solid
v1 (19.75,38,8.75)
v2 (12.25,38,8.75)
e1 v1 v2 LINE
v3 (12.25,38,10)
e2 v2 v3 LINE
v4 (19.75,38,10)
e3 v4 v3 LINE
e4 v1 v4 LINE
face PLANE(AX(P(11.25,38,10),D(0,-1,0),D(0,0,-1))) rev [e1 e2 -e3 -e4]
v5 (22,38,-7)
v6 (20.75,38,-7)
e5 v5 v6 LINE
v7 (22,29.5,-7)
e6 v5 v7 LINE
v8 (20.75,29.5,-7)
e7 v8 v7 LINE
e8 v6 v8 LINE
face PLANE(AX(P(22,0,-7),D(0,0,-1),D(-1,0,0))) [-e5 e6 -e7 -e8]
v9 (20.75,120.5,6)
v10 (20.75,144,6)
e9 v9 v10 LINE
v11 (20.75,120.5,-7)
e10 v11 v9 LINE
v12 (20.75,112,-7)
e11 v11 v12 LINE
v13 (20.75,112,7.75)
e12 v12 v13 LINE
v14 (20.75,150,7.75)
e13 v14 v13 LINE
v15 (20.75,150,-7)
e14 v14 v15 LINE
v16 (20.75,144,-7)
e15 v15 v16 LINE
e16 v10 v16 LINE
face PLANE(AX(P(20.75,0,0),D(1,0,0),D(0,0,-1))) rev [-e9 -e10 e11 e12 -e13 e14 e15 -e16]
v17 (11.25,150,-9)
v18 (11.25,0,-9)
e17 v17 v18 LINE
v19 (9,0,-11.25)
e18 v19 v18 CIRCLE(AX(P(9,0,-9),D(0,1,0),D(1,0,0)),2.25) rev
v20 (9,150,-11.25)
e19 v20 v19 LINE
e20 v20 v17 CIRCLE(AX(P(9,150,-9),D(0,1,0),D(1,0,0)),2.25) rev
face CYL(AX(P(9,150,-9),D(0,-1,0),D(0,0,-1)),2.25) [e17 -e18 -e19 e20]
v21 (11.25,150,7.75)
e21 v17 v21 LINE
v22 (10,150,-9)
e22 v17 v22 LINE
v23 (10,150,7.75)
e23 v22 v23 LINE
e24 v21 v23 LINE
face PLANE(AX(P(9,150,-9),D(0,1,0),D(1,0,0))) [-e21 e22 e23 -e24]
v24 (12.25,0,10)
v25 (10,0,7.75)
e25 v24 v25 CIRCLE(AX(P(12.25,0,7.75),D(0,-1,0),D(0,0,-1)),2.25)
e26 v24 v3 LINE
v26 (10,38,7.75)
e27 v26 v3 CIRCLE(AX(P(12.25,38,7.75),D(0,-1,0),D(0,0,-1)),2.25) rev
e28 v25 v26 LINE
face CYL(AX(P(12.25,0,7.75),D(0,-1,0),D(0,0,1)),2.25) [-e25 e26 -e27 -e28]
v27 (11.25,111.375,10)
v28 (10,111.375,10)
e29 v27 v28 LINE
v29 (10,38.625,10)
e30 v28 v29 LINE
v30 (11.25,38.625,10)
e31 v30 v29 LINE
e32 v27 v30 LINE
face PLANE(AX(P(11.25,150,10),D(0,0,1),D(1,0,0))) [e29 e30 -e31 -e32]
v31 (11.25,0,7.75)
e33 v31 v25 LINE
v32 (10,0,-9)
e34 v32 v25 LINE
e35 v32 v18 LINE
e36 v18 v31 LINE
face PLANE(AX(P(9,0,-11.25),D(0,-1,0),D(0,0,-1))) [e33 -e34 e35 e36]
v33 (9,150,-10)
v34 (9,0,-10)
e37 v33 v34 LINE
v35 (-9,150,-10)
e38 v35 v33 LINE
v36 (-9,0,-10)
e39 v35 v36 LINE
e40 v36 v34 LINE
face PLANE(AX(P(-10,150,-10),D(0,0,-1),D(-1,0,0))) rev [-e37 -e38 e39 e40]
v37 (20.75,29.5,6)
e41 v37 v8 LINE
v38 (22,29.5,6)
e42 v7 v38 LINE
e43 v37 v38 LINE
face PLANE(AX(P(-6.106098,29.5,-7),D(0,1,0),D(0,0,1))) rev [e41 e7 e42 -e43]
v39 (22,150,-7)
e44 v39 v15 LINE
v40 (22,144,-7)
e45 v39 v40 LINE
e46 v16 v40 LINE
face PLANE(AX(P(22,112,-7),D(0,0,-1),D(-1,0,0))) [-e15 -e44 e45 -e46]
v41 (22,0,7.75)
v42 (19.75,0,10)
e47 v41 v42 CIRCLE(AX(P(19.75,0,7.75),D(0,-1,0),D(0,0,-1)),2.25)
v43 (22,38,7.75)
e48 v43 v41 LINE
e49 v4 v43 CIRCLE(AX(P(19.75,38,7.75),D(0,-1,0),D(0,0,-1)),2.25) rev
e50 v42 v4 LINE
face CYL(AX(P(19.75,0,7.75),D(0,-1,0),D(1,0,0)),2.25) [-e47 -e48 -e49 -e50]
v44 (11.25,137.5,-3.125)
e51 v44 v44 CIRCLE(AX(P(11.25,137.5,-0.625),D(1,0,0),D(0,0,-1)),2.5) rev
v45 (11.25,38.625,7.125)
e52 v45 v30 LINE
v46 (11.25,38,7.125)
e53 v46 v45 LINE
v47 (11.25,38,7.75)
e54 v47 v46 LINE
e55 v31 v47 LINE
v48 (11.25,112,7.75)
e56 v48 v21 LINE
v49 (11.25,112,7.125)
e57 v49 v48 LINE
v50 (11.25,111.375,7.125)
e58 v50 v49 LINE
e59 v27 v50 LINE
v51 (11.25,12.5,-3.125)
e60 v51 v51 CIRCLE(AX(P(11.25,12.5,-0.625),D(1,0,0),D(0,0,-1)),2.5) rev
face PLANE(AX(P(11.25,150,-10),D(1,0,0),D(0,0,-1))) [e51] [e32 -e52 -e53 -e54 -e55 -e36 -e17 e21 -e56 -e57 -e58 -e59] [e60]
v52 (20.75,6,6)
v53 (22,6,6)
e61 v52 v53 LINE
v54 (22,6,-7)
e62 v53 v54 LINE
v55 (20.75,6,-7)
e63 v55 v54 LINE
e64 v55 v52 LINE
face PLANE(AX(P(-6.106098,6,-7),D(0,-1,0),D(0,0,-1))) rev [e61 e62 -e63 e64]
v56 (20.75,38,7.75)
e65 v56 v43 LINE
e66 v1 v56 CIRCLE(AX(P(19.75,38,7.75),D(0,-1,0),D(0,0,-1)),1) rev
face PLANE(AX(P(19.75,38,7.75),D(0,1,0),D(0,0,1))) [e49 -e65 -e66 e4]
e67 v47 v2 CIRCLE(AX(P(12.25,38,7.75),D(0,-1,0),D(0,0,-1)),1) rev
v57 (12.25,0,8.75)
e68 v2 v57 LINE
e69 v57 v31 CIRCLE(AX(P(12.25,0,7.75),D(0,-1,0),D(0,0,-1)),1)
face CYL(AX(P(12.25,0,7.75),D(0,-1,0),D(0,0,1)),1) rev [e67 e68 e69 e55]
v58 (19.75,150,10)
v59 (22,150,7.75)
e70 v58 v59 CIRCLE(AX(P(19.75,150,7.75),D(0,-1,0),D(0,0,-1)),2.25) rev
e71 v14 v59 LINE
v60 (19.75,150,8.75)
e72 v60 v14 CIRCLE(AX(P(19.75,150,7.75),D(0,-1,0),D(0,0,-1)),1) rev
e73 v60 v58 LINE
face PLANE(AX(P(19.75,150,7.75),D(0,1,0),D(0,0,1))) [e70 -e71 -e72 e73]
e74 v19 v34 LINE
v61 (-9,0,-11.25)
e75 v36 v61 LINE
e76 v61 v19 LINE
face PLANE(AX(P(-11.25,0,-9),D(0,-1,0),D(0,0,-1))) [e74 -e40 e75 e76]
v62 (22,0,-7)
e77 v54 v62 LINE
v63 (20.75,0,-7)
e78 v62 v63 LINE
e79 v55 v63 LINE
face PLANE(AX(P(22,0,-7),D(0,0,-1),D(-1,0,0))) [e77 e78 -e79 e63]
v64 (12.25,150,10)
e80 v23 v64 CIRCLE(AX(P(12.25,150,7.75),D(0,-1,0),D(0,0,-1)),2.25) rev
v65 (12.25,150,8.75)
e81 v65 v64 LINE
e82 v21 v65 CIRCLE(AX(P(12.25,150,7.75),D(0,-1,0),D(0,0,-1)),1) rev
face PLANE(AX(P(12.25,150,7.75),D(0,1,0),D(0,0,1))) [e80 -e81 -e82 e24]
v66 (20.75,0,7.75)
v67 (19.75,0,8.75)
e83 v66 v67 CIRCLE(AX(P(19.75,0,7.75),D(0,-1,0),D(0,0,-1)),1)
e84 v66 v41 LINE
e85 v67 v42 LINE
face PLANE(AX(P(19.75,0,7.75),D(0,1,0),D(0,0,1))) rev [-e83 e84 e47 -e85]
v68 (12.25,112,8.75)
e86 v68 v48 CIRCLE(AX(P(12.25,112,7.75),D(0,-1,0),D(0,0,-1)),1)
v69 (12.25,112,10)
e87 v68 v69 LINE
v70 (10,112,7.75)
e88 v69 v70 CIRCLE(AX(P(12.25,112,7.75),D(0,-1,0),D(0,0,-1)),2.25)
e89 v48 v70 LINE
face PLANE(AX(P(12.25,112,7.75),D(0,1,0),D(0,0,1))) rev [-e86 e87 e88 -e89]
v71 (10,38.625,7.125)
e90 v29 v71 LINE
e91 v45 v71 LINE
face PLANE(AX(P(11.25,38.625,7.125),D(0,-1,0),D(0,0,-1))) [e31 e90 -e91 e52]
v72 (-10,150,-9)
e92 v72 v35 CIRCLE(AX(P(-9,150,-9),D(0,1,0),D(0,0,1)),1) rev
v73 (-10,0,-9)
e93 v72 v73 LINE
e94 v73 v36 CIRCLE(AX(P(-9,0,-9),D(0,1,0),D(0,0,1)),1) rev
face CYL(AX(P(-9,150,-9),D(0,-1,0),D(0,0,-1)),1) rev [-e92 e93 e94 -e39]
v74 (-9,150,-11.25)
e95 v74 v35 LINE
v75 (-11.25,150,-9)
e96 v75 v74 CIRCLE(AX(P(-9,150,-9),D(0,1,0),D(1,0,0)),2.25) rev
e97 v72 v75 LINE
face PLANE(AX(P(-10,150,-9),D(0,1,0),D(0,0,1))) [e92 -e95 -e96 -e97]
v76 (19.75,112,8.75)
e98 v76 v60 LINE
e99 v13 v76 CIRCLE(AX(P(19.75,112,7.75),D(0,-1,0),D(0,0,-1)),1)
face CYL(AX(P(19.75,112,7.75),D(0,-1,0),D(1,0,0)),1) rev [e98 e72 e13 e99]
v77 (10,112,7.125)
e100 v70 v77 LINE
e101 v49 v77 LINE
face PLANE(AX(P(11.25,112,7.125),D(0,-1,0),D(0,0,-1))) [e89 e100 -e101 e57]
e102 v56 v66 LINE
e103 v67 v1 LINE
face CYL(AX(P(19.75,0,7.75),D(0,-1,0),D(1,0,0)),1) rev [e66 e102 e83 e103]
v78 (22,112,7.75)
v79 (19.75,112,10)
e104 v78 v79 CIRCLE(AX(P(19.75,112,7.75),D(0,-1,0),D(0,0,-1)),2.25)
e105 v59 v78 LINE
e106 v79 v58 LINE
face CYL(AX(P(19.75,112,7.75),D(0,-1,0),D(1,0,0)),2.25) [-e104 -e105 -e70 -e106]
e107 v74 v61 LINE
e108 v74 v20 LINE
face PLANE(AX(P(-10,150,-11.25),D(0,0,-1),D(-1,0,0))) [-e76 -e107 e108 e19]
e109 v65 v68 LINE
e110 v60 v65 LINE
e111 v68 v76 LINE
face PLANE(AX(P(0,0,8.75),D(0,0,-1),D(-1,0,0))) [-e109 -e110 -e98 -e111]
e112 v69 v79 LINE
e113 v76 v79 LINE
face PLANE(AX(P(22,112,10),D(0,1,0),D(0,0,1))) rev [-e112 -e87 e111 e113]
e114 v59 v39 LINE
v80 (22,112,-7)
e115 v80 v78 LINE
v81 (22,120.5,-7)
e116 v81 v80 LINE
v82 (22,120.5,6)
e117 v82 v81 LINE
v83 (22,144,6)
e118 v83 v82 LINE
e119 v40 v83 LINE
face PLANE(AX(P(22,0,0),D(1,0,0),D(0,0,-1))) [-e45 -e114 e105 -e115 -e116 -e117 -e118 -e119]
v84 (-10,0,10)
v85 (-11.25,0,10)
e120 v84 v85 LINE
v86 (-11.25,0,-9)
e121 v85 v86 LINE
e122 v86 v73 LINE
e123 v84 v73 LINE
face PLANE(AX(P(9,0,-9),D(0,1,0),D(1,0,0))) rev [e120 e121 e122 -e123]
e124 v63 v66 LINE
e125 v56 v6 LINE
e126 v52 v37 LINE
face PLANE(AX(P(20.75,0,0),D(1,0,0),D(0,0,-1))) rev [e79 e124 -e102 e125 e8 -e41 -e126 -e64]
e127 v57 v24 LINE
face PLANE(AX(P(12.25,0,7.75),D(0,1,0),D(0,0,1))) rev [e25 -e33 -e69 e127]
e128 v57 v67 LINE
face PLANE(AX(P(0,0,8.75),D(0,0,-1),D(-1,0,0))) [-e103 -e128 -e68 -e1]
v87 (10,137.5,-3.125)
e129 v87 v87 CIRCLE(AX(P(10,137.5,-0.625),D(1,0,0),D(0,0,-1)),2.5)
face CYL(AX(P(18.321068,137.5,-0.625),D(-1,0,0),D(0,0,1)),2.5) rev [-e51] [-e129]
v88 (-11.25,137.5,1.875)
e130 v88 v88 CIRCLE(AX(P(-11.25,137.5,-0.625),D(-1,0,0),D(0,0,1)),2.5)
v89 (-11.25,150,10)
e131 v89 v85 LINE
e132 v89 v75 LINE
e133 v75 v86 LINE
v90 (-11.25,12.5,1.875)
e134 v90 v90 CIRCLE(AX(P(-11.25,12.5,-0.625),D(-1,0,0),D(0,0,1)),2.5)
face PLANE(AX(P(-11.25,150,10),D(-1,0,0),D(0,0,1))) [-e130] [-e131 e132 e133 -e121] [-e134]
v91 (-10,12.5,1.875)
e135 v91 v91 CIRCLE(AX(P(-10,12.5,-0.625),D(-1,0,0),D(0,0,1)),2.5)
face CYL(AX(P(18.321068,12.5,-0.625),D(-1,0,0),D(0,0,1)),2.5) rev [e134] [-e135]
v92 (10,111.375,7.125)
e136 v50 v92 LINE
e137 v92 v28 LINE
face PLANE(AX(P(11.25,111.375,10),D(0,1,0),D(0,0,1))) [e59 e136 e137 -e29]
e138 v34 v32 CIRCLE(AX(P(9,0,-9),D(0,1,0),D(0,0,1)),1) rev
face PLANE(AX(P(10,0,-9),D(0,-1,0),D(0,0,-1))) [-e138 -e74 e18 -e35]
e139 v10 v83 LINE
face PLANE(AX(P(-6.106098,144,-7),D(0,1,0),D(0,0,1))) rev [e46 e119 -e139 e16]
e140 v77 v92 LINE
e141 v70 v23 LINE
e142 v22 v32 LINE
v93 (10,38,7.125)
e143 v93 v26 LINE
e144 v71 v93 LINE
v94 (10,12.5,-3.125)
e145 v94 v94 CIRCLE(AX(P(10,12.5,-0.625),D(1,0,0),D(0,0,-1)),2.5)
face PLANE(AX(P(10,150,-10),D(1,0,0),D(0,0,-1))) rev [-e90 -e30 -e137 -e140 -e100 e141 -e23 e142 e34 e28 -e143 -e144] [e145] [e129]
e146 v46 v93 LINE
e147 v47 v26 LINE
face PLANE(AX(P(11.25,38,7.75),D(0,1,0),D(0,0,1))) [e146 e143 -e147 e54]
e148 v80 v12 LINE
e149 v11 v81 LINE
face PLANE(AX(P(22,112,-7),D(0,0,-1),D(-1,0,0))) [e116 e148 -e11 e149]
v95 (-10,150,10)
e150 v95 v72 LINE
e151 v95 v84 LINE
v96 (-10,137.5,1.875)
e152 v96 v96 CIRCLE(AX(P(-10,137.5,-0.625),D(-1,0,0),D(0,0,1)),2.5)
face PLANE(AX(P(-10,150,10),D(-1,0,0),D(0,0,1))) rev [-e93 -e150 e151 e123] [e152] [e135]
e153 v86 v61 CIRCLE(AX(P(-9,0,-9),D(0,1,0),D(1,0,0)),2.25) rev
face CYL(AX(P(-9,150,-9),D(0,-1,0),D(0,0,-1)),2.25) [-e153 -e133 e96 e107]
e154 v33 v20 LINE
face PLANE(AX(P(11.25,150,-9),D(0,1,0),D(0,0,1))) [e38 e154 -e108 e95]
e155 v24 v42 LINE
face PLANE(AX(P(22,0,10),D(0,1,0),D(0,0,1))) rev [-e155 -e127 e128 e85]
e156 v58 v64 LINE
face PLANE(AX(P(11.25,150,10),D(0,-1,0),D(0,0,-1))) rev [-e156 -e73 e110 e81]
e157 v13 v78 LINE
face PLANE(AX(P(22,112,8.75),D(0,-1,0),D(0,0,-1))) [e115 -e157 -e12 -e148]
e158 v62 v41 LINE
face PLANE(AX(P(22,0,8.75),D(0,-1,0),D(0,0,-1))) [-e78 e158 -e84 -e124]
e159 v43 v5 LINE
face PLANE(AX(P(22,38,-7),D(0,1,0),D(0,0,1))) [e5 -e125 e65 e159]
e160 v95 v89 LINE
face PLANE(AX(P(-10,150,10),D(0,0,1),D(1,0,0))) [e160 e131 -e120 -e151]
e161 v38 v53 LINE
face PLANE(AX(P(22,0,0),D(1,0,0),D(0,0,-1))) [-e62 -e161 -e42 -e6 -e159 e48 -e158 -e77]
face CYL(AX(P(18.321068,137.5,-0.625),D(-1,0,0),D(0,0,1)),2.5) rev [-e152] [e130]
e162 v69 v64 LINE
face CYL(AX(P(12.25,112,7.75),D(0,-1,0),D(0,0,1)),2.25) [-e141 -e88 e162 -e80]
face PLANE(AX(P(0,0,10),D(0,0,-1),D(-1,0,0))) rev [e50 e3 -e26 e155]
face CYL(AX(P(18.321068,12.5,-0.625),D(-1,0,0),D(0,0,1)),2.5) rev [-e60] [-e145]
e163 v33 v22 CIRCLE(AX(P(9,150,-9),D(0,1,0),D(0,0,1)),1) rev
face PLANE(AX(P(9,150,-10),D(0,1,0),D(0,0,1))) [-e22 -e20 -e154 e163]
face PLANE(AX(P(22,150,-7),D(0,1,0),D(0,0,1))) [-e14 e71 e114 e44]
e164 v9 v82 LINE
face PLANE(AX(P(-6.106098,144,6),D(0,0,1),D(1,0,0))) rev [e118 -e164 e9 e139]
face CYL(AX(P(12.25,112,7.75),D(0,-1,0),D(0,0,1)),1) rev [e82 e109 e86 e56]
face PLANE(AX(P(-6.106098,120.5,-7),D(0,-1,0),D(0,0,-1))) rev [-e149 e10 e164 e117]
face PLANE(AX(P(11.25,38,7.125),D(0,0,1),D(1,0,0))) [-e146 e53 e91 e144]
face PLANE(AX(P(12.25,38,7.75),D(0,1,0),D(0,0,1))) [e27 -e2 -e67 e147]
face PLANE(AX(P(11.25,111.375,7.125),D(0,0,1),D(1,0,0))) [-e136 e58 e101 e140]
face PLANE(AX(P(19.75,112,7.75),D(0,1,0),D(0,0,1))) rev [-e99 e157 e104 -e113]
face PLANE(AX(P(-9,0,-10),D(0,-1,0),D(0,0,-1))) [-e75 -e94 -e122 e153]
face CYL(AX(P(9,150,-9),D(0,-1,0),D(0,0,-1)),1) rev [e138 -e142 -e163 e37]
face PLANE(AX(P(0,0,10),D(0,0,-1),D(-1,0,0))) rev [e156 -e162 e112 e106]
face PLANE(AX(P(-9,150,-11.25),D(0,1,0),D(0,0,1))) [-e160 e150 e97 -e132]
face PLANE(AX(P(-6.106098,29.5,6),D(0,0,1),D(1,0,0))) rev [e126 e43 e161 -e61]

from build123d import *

# Parameters (mm, degrees)
BASE_FLANGE1_DEPTH            = 150
CUT_EXTRUDE1_REACH            = 154.095
SKETCH7_R                     = 2.5
EDGE_FLANGE1_STRIP_W          = 7
EDGE_FLANGE1_STRIP_H          = 1.25
EDGE_FLANGE1_STRIP_CUT_DEPTH  = 38
EDGE_FLANGE1_RELIEF_W         = 7.625
EDGE_FLANGE1_RELIEF_H         = 0.625
EDGE_FLANGE1_RELIEF_CUT_DEPTH = 1.25
EDGE_FLANGE1_DEPTH            = 38
EDGE_FLANGE2_STRIP_W          = 7
EDGE_FLANGE2_STRIP_H          = 1.25
EDGE_FLANGE2_STRIP_CUT_DEPTH  = 38
EDGE_FLANGE2_DEPTH            = 38
SKETCH14_W                    = 13
SKETCH14_H                    = 23.5
CUT_EXTRUDE2_DEPTH            = 1.25
EDGE_FLANGE3_STRIP_W          = 7
EDGE_FLANGE3_STRIP_H          = 1.25
EDGE_FLANGE3_STRIP_CUT_DEPTH  = 38
EDGE_FLANGE3_RELIEF_W         = 7.625
EDGE_FLANGE3_RELIEF_H         = 0.625
EDGE_FLANGE3_RELIEF_CUT_DEPTH = 1.25
EDGE_FLANGE3_DEPTH            = 38
EDGE_FLANGE4_STRIP_W          = 7
EDGE_FLANGE4_STRIP_H          = 1.25
EDGE_FLANGE4_STRIP_CUT_DEPTH  = 38
EDGE_FLANGE4_DEPTH            = 38
SKETCH21_W                    = 13
SKETCH21_H                    = 23.5
CUT_EXTRUDE3_DEPTH            = 1.25


# Sheet-metal steps are written as plain solids
with BuildPart() as part:
    # Sketch2 → Base-Flange1 (new body)
    with BuildSketch(Plane(origin=(0, 0, 0), x_dir=(1, 0, 0), z_dir=(0, 1, 0))):
        with BuildLine():
            Line((-10, -10), (-10, 9))
            ThreePointArc((-10, 9), (-9.707106781, 9.707106781), (-9, 10))
            Line((-9, 10), (9, 10))
            ThreePointArc((9, 10), (9.707106781, 9.707106781), (10, 9))
            Line((10, 9), (10, -10))
            Line((10, -10), (11.25, -10))
            Line((11.25, -10), (11.25, 9))
            ThreePointArc((11.25, 9), (10.590990258, 10.590990258), (9, 11.25))
            Line((9, 11.25), (-9, 11.25))
            ThreePointArc((-9, 11.25), (-10.590990258, 10.590990258), (-11.25, 9))
            Line((-11.25, 9), (-11.25, -10))
            Line((-11.25, -10), (-10, -10))
        make_face()
    extrude(amount=BASE_FLANGE1_DEPTH)

    # Cut-Extrude1: up to this face of the body (flat: up to its plane)
    cut_extrude1_end = Plane(part.part.faces().sort_by_distance((11.25, 75, 0.5))[0])
    # Sketch7 → Cut-Extrude1 (cut, up to the picked face)
    with BuildSketch(Plane.ZY.offset(11.25), mode=Mode.PRIVATE) as cut_extrude1_sk1:
        with Locations((-0.625, 12.5)):
            Circle(SKETCH7_R)
    cut_extrude1_tool1 = split(extrude(cut_extrude1_sk1.sketch, amount=-CUT_EXTRUDE1_REACH, mode=Mode.PRIVATE), bisect_by=cut_extrude1_end, keep=Keep.BOTH, mode=Mode.PRIVATE)
    # Sketch7 → Cut-Extrude1 (cut, up to the picked face)
    with BuildSketch(Plane.ZY.offset(11.25), mode=Mode.PRIVATE) as cut_extrude1_sk2:
        with Locations((-0.625, 137.5)):
            Circle(SKETCH7_R)
    cut_extrude1_tool2 = split(extrude(cut_extrude1_sk2.sketch, amount=-CUT_EXTRUDE1_REACH, mode=Mode.PRIVATE), bisect_by=cut_extrude1_end, keep=Keep.BOTH, mode=Mode.PRIVATE)
    add(cut_extrude1_tool1.solids().sort_by(Axis((-11.25, 12.5, -0.625), (1, 0, 0)))[0], mode=Mode.SUBTRACT)
    add(cut_extrude1_tool2.solids().sort_by(Axis((-11.25, 137.5, -0.625), (1, 0, 0)))[0], mode=Mode.SUBTRACT)

    # Edge-Flange1 strip (across the edge) → Edge-Flange1 strip cut (cut)
    with BuildSketch(Plane(origin=(11.25, 38, 10), x_dir=(0, 0, -1), z_dir=(0, -1, 0))):
        with Locations((-1.25, -0.625)):
            Rectangle(EDGE_FLANGE1_STRIP_W, EDGE_FLANGE1_STRIP_H)
    extrude(amount=EDGE_FLANGE1_STRIP_CUT_DEPTH, mode=Mode.SUBTRACT)

    # Edge-Flange1 relief (on the sheet) → Edge-Flange1 relief cut (cut)
    with BuildSketch(Plane(origin=(11.25, 38, 7.75), x_dir=(0, 0, -1), z_dir=(1, 0, 0))):
        with Locations((-3.1875, 0.3125)):
            Rectangle(EDGE_FLANGE1_RELIEF_W, EDGE_FLANGE1_RELIEF_H)
    extrude(amount=-EDGE_FLANGE1_RELIEF_CUT_DEPTH, mode=Mode.SUBTRACT)

    # Edge-Flange1 section (across the edge) → Edge-Flange1 (add)
    with BuildSketch(Plane(origin=(11.25, 38, 10), x_dir=(0, 0, -1), z_dir=(0, -1, 0))):
        with BuildLine():
            Line((0, 1), (0, 10.75))
            Line((0, 10.75), (1.25, 10.75))
            Line((1.25, 10.75), (1.25, 1))
            ThreePointArc((1.25, 1), (1.542893219, 0.292893219), (2.25, 0))
            Line((2.25, 0), (2.25, -1.25))
            ThreePointArc((2.25, -1.25), (0.659009742, -0.590990258), (0, 1))
        make_face()
    extrude(amount=EDGE_FLANGE1_DEPTH)

    # Edge-Flange2 strip (across the edge) → Edge-Flange2 strip cut (cut)
    with BuildSketch(Plane(origin=(22, 38, 8.75), x_dir=(-1, 0, 0), z_dir=(0, -1, 0))):
        with Locations((-1.25, -0.625)):
            Rectangle(EDGE_FLANGE2_STRIP_W, EDGE_FLANGE2_STRIP_H)
    extrude(amount=EDGE_FLANGE2_STRIP_CUT_DEPTH, mode=Mode.SUBTRACT)

    # Edge-Flange2 section (across the edge) → Edge-Flange2 (add)
    with BuildSketch(Plane(origin=(22, 38, 8.75), x_dir=(-1, 0, 0), z_dir=(0, -1, 0))):
        with BuildLine():
            Line((0, 1), (0, 15.75))
            Line((0, 15.75), (1.25, 15.75))
            Line((1.25, 15.75), (1.25, 1))
            ThreePointArc((1.25, 1), (1.542893219, 0.292893219), (2.25, 0))
            Line((2.25, 0), (2.25, -1.25))
            ThreePointArc((2.25, -1.25), (0.659009742, -0.590990258), (0, 1))
        make_face()
    extrude(amount=EDGE_FLANGE2_DEPTH)

    # Sketch14 → Cut-Extrude2 (cut)
    with BuildSketch(Plane(origin=(22, 0, 0), x_dir=(0, 0, -1), z_dir=(1, 0, 0))):
        with Locations((0.5, 17.75)):
            Rectangle(SKETCH14_W, SKETCH14_H)
    extrude(amount=-CUT_EXTRUDE2_DEPTH, mode=Mode.SUBTRACT)

    # Edge-Flange3 strip (across the edge) → Edge-Flange3 strip cut (cut)
    with BuildSketch(Plane(origin=(11.25, 150, 10), x_dir=(0, 0, -1), z_dir=(0, -1, 0))):
        with Locations((-1.25, -0.625)):
            Rectangle(EDGE_FLANGE3_STRIP_W, EDGE_FLANGE3_STRIP_H)
    extrude(amount=EDGE_FLANGE3_STRIP_CUT_DEPTH, mode=Mode.SUBTRACT)

    # Edge-Flange3 relief (on the sheet) → Edge-Flange3 relief cut (cut)
    with BuildSketch(Plane(origin=(11.25, 150, 7.75), x_dir=(0, 0, -1), z_dir=(1, 0, 0))):
        with Locations((-3.1875, -38.3125)):
            Rectangle(EDGE_FLANGE3_RELIEF_W, EDGE_FLANGE3_RELIEF_H)
    extrude(amount=-EDGE_FLANGE3_RELIEF_CUT_DEPTH, mode=Mode.SUBTRACT)

    # Edge-Flange3 section (across the edge) → Edge-Flange3 (add)
    with BuildSketch(Plane(origin=(11.25, 150, 10), x_dir=(0, 0, -1), z_dir=(0, -1, 0))):
        with BuildLine():
            Line((0, 1), (0, 10.75))
            Line((0, 10.75), (1.25, 10.75))
            Line((1.25, 10.75), (1.25, 1))
            ThreePointArc((1.25, 1), (1.542893219, 0.292893219), (2.25, 0))
            Line((2.25, 0), (2.25, -1.25))
            ThreePointArc((2.25, -1.25), (0.659009742, -0.590990258), (0, 1))
        make_face()
    extrude(amount=EDGE_FLANGE3_DEPTH)

    # Edge-Flange4 strip (across the edge) → Edge-Flange4 strip cut (cut)
    with BuildSketch(Plane(origin=(22, 150, 8.75), x_dir=(-1, 0, 0), z_dir=(0, -1, 0))):
        with Locations((-1.25, -0.625)):
            Rectangle(EDGE_FLANGE4_STRIP_W, EDGE_FLANGE4_STRIP_H)
    extrude(amount=EDGE_FLANGE4_STRIP_CUT_DEPTH, mode=Mode.SUBTRACT)

    # Edge-Flange4 section (across the edge) → Edge-Flange4 (add)
    with BuildSketch(Plane(origin=(22, 150, 8.75), x_dir=(-1, 0, 0), z_dir=(0, -1, 0))):
        with BuildLine():
            Line((0, 1), (0, 15.75))
            Line((0, 15.75), (1.25, 15.75))
            Line((1.25, 15.75), (1.25, 1))
            ThreePointArc((1.25, 1), (1.542893219, 0.292893219), (2.25, 0))
            Line((2.25, 0), (2.25, -1.25))
            ThreePointArc((2.25, -1.25), (0.659009742, -0.590990258), (0, 1))
        make_face()
    extrude(amount=EDGE_FLANGE4_DEPTH)

    # Sketch21 → Cut-Extrude3 (cut)
    with BuildSketch(Plane(origin=(22, 0, 0), x_dir=(0, 0, -1), z_dir=(1, 0, 0))):
        with Locations((0.5, 132.25)):
            Rectangle(SKETCH21_W, SKETCH21_H)
    extrude(amount=-CUT_EXTRUDE3_DEPTH, mode=Mode.SUBTRACT)


solid = part.part
